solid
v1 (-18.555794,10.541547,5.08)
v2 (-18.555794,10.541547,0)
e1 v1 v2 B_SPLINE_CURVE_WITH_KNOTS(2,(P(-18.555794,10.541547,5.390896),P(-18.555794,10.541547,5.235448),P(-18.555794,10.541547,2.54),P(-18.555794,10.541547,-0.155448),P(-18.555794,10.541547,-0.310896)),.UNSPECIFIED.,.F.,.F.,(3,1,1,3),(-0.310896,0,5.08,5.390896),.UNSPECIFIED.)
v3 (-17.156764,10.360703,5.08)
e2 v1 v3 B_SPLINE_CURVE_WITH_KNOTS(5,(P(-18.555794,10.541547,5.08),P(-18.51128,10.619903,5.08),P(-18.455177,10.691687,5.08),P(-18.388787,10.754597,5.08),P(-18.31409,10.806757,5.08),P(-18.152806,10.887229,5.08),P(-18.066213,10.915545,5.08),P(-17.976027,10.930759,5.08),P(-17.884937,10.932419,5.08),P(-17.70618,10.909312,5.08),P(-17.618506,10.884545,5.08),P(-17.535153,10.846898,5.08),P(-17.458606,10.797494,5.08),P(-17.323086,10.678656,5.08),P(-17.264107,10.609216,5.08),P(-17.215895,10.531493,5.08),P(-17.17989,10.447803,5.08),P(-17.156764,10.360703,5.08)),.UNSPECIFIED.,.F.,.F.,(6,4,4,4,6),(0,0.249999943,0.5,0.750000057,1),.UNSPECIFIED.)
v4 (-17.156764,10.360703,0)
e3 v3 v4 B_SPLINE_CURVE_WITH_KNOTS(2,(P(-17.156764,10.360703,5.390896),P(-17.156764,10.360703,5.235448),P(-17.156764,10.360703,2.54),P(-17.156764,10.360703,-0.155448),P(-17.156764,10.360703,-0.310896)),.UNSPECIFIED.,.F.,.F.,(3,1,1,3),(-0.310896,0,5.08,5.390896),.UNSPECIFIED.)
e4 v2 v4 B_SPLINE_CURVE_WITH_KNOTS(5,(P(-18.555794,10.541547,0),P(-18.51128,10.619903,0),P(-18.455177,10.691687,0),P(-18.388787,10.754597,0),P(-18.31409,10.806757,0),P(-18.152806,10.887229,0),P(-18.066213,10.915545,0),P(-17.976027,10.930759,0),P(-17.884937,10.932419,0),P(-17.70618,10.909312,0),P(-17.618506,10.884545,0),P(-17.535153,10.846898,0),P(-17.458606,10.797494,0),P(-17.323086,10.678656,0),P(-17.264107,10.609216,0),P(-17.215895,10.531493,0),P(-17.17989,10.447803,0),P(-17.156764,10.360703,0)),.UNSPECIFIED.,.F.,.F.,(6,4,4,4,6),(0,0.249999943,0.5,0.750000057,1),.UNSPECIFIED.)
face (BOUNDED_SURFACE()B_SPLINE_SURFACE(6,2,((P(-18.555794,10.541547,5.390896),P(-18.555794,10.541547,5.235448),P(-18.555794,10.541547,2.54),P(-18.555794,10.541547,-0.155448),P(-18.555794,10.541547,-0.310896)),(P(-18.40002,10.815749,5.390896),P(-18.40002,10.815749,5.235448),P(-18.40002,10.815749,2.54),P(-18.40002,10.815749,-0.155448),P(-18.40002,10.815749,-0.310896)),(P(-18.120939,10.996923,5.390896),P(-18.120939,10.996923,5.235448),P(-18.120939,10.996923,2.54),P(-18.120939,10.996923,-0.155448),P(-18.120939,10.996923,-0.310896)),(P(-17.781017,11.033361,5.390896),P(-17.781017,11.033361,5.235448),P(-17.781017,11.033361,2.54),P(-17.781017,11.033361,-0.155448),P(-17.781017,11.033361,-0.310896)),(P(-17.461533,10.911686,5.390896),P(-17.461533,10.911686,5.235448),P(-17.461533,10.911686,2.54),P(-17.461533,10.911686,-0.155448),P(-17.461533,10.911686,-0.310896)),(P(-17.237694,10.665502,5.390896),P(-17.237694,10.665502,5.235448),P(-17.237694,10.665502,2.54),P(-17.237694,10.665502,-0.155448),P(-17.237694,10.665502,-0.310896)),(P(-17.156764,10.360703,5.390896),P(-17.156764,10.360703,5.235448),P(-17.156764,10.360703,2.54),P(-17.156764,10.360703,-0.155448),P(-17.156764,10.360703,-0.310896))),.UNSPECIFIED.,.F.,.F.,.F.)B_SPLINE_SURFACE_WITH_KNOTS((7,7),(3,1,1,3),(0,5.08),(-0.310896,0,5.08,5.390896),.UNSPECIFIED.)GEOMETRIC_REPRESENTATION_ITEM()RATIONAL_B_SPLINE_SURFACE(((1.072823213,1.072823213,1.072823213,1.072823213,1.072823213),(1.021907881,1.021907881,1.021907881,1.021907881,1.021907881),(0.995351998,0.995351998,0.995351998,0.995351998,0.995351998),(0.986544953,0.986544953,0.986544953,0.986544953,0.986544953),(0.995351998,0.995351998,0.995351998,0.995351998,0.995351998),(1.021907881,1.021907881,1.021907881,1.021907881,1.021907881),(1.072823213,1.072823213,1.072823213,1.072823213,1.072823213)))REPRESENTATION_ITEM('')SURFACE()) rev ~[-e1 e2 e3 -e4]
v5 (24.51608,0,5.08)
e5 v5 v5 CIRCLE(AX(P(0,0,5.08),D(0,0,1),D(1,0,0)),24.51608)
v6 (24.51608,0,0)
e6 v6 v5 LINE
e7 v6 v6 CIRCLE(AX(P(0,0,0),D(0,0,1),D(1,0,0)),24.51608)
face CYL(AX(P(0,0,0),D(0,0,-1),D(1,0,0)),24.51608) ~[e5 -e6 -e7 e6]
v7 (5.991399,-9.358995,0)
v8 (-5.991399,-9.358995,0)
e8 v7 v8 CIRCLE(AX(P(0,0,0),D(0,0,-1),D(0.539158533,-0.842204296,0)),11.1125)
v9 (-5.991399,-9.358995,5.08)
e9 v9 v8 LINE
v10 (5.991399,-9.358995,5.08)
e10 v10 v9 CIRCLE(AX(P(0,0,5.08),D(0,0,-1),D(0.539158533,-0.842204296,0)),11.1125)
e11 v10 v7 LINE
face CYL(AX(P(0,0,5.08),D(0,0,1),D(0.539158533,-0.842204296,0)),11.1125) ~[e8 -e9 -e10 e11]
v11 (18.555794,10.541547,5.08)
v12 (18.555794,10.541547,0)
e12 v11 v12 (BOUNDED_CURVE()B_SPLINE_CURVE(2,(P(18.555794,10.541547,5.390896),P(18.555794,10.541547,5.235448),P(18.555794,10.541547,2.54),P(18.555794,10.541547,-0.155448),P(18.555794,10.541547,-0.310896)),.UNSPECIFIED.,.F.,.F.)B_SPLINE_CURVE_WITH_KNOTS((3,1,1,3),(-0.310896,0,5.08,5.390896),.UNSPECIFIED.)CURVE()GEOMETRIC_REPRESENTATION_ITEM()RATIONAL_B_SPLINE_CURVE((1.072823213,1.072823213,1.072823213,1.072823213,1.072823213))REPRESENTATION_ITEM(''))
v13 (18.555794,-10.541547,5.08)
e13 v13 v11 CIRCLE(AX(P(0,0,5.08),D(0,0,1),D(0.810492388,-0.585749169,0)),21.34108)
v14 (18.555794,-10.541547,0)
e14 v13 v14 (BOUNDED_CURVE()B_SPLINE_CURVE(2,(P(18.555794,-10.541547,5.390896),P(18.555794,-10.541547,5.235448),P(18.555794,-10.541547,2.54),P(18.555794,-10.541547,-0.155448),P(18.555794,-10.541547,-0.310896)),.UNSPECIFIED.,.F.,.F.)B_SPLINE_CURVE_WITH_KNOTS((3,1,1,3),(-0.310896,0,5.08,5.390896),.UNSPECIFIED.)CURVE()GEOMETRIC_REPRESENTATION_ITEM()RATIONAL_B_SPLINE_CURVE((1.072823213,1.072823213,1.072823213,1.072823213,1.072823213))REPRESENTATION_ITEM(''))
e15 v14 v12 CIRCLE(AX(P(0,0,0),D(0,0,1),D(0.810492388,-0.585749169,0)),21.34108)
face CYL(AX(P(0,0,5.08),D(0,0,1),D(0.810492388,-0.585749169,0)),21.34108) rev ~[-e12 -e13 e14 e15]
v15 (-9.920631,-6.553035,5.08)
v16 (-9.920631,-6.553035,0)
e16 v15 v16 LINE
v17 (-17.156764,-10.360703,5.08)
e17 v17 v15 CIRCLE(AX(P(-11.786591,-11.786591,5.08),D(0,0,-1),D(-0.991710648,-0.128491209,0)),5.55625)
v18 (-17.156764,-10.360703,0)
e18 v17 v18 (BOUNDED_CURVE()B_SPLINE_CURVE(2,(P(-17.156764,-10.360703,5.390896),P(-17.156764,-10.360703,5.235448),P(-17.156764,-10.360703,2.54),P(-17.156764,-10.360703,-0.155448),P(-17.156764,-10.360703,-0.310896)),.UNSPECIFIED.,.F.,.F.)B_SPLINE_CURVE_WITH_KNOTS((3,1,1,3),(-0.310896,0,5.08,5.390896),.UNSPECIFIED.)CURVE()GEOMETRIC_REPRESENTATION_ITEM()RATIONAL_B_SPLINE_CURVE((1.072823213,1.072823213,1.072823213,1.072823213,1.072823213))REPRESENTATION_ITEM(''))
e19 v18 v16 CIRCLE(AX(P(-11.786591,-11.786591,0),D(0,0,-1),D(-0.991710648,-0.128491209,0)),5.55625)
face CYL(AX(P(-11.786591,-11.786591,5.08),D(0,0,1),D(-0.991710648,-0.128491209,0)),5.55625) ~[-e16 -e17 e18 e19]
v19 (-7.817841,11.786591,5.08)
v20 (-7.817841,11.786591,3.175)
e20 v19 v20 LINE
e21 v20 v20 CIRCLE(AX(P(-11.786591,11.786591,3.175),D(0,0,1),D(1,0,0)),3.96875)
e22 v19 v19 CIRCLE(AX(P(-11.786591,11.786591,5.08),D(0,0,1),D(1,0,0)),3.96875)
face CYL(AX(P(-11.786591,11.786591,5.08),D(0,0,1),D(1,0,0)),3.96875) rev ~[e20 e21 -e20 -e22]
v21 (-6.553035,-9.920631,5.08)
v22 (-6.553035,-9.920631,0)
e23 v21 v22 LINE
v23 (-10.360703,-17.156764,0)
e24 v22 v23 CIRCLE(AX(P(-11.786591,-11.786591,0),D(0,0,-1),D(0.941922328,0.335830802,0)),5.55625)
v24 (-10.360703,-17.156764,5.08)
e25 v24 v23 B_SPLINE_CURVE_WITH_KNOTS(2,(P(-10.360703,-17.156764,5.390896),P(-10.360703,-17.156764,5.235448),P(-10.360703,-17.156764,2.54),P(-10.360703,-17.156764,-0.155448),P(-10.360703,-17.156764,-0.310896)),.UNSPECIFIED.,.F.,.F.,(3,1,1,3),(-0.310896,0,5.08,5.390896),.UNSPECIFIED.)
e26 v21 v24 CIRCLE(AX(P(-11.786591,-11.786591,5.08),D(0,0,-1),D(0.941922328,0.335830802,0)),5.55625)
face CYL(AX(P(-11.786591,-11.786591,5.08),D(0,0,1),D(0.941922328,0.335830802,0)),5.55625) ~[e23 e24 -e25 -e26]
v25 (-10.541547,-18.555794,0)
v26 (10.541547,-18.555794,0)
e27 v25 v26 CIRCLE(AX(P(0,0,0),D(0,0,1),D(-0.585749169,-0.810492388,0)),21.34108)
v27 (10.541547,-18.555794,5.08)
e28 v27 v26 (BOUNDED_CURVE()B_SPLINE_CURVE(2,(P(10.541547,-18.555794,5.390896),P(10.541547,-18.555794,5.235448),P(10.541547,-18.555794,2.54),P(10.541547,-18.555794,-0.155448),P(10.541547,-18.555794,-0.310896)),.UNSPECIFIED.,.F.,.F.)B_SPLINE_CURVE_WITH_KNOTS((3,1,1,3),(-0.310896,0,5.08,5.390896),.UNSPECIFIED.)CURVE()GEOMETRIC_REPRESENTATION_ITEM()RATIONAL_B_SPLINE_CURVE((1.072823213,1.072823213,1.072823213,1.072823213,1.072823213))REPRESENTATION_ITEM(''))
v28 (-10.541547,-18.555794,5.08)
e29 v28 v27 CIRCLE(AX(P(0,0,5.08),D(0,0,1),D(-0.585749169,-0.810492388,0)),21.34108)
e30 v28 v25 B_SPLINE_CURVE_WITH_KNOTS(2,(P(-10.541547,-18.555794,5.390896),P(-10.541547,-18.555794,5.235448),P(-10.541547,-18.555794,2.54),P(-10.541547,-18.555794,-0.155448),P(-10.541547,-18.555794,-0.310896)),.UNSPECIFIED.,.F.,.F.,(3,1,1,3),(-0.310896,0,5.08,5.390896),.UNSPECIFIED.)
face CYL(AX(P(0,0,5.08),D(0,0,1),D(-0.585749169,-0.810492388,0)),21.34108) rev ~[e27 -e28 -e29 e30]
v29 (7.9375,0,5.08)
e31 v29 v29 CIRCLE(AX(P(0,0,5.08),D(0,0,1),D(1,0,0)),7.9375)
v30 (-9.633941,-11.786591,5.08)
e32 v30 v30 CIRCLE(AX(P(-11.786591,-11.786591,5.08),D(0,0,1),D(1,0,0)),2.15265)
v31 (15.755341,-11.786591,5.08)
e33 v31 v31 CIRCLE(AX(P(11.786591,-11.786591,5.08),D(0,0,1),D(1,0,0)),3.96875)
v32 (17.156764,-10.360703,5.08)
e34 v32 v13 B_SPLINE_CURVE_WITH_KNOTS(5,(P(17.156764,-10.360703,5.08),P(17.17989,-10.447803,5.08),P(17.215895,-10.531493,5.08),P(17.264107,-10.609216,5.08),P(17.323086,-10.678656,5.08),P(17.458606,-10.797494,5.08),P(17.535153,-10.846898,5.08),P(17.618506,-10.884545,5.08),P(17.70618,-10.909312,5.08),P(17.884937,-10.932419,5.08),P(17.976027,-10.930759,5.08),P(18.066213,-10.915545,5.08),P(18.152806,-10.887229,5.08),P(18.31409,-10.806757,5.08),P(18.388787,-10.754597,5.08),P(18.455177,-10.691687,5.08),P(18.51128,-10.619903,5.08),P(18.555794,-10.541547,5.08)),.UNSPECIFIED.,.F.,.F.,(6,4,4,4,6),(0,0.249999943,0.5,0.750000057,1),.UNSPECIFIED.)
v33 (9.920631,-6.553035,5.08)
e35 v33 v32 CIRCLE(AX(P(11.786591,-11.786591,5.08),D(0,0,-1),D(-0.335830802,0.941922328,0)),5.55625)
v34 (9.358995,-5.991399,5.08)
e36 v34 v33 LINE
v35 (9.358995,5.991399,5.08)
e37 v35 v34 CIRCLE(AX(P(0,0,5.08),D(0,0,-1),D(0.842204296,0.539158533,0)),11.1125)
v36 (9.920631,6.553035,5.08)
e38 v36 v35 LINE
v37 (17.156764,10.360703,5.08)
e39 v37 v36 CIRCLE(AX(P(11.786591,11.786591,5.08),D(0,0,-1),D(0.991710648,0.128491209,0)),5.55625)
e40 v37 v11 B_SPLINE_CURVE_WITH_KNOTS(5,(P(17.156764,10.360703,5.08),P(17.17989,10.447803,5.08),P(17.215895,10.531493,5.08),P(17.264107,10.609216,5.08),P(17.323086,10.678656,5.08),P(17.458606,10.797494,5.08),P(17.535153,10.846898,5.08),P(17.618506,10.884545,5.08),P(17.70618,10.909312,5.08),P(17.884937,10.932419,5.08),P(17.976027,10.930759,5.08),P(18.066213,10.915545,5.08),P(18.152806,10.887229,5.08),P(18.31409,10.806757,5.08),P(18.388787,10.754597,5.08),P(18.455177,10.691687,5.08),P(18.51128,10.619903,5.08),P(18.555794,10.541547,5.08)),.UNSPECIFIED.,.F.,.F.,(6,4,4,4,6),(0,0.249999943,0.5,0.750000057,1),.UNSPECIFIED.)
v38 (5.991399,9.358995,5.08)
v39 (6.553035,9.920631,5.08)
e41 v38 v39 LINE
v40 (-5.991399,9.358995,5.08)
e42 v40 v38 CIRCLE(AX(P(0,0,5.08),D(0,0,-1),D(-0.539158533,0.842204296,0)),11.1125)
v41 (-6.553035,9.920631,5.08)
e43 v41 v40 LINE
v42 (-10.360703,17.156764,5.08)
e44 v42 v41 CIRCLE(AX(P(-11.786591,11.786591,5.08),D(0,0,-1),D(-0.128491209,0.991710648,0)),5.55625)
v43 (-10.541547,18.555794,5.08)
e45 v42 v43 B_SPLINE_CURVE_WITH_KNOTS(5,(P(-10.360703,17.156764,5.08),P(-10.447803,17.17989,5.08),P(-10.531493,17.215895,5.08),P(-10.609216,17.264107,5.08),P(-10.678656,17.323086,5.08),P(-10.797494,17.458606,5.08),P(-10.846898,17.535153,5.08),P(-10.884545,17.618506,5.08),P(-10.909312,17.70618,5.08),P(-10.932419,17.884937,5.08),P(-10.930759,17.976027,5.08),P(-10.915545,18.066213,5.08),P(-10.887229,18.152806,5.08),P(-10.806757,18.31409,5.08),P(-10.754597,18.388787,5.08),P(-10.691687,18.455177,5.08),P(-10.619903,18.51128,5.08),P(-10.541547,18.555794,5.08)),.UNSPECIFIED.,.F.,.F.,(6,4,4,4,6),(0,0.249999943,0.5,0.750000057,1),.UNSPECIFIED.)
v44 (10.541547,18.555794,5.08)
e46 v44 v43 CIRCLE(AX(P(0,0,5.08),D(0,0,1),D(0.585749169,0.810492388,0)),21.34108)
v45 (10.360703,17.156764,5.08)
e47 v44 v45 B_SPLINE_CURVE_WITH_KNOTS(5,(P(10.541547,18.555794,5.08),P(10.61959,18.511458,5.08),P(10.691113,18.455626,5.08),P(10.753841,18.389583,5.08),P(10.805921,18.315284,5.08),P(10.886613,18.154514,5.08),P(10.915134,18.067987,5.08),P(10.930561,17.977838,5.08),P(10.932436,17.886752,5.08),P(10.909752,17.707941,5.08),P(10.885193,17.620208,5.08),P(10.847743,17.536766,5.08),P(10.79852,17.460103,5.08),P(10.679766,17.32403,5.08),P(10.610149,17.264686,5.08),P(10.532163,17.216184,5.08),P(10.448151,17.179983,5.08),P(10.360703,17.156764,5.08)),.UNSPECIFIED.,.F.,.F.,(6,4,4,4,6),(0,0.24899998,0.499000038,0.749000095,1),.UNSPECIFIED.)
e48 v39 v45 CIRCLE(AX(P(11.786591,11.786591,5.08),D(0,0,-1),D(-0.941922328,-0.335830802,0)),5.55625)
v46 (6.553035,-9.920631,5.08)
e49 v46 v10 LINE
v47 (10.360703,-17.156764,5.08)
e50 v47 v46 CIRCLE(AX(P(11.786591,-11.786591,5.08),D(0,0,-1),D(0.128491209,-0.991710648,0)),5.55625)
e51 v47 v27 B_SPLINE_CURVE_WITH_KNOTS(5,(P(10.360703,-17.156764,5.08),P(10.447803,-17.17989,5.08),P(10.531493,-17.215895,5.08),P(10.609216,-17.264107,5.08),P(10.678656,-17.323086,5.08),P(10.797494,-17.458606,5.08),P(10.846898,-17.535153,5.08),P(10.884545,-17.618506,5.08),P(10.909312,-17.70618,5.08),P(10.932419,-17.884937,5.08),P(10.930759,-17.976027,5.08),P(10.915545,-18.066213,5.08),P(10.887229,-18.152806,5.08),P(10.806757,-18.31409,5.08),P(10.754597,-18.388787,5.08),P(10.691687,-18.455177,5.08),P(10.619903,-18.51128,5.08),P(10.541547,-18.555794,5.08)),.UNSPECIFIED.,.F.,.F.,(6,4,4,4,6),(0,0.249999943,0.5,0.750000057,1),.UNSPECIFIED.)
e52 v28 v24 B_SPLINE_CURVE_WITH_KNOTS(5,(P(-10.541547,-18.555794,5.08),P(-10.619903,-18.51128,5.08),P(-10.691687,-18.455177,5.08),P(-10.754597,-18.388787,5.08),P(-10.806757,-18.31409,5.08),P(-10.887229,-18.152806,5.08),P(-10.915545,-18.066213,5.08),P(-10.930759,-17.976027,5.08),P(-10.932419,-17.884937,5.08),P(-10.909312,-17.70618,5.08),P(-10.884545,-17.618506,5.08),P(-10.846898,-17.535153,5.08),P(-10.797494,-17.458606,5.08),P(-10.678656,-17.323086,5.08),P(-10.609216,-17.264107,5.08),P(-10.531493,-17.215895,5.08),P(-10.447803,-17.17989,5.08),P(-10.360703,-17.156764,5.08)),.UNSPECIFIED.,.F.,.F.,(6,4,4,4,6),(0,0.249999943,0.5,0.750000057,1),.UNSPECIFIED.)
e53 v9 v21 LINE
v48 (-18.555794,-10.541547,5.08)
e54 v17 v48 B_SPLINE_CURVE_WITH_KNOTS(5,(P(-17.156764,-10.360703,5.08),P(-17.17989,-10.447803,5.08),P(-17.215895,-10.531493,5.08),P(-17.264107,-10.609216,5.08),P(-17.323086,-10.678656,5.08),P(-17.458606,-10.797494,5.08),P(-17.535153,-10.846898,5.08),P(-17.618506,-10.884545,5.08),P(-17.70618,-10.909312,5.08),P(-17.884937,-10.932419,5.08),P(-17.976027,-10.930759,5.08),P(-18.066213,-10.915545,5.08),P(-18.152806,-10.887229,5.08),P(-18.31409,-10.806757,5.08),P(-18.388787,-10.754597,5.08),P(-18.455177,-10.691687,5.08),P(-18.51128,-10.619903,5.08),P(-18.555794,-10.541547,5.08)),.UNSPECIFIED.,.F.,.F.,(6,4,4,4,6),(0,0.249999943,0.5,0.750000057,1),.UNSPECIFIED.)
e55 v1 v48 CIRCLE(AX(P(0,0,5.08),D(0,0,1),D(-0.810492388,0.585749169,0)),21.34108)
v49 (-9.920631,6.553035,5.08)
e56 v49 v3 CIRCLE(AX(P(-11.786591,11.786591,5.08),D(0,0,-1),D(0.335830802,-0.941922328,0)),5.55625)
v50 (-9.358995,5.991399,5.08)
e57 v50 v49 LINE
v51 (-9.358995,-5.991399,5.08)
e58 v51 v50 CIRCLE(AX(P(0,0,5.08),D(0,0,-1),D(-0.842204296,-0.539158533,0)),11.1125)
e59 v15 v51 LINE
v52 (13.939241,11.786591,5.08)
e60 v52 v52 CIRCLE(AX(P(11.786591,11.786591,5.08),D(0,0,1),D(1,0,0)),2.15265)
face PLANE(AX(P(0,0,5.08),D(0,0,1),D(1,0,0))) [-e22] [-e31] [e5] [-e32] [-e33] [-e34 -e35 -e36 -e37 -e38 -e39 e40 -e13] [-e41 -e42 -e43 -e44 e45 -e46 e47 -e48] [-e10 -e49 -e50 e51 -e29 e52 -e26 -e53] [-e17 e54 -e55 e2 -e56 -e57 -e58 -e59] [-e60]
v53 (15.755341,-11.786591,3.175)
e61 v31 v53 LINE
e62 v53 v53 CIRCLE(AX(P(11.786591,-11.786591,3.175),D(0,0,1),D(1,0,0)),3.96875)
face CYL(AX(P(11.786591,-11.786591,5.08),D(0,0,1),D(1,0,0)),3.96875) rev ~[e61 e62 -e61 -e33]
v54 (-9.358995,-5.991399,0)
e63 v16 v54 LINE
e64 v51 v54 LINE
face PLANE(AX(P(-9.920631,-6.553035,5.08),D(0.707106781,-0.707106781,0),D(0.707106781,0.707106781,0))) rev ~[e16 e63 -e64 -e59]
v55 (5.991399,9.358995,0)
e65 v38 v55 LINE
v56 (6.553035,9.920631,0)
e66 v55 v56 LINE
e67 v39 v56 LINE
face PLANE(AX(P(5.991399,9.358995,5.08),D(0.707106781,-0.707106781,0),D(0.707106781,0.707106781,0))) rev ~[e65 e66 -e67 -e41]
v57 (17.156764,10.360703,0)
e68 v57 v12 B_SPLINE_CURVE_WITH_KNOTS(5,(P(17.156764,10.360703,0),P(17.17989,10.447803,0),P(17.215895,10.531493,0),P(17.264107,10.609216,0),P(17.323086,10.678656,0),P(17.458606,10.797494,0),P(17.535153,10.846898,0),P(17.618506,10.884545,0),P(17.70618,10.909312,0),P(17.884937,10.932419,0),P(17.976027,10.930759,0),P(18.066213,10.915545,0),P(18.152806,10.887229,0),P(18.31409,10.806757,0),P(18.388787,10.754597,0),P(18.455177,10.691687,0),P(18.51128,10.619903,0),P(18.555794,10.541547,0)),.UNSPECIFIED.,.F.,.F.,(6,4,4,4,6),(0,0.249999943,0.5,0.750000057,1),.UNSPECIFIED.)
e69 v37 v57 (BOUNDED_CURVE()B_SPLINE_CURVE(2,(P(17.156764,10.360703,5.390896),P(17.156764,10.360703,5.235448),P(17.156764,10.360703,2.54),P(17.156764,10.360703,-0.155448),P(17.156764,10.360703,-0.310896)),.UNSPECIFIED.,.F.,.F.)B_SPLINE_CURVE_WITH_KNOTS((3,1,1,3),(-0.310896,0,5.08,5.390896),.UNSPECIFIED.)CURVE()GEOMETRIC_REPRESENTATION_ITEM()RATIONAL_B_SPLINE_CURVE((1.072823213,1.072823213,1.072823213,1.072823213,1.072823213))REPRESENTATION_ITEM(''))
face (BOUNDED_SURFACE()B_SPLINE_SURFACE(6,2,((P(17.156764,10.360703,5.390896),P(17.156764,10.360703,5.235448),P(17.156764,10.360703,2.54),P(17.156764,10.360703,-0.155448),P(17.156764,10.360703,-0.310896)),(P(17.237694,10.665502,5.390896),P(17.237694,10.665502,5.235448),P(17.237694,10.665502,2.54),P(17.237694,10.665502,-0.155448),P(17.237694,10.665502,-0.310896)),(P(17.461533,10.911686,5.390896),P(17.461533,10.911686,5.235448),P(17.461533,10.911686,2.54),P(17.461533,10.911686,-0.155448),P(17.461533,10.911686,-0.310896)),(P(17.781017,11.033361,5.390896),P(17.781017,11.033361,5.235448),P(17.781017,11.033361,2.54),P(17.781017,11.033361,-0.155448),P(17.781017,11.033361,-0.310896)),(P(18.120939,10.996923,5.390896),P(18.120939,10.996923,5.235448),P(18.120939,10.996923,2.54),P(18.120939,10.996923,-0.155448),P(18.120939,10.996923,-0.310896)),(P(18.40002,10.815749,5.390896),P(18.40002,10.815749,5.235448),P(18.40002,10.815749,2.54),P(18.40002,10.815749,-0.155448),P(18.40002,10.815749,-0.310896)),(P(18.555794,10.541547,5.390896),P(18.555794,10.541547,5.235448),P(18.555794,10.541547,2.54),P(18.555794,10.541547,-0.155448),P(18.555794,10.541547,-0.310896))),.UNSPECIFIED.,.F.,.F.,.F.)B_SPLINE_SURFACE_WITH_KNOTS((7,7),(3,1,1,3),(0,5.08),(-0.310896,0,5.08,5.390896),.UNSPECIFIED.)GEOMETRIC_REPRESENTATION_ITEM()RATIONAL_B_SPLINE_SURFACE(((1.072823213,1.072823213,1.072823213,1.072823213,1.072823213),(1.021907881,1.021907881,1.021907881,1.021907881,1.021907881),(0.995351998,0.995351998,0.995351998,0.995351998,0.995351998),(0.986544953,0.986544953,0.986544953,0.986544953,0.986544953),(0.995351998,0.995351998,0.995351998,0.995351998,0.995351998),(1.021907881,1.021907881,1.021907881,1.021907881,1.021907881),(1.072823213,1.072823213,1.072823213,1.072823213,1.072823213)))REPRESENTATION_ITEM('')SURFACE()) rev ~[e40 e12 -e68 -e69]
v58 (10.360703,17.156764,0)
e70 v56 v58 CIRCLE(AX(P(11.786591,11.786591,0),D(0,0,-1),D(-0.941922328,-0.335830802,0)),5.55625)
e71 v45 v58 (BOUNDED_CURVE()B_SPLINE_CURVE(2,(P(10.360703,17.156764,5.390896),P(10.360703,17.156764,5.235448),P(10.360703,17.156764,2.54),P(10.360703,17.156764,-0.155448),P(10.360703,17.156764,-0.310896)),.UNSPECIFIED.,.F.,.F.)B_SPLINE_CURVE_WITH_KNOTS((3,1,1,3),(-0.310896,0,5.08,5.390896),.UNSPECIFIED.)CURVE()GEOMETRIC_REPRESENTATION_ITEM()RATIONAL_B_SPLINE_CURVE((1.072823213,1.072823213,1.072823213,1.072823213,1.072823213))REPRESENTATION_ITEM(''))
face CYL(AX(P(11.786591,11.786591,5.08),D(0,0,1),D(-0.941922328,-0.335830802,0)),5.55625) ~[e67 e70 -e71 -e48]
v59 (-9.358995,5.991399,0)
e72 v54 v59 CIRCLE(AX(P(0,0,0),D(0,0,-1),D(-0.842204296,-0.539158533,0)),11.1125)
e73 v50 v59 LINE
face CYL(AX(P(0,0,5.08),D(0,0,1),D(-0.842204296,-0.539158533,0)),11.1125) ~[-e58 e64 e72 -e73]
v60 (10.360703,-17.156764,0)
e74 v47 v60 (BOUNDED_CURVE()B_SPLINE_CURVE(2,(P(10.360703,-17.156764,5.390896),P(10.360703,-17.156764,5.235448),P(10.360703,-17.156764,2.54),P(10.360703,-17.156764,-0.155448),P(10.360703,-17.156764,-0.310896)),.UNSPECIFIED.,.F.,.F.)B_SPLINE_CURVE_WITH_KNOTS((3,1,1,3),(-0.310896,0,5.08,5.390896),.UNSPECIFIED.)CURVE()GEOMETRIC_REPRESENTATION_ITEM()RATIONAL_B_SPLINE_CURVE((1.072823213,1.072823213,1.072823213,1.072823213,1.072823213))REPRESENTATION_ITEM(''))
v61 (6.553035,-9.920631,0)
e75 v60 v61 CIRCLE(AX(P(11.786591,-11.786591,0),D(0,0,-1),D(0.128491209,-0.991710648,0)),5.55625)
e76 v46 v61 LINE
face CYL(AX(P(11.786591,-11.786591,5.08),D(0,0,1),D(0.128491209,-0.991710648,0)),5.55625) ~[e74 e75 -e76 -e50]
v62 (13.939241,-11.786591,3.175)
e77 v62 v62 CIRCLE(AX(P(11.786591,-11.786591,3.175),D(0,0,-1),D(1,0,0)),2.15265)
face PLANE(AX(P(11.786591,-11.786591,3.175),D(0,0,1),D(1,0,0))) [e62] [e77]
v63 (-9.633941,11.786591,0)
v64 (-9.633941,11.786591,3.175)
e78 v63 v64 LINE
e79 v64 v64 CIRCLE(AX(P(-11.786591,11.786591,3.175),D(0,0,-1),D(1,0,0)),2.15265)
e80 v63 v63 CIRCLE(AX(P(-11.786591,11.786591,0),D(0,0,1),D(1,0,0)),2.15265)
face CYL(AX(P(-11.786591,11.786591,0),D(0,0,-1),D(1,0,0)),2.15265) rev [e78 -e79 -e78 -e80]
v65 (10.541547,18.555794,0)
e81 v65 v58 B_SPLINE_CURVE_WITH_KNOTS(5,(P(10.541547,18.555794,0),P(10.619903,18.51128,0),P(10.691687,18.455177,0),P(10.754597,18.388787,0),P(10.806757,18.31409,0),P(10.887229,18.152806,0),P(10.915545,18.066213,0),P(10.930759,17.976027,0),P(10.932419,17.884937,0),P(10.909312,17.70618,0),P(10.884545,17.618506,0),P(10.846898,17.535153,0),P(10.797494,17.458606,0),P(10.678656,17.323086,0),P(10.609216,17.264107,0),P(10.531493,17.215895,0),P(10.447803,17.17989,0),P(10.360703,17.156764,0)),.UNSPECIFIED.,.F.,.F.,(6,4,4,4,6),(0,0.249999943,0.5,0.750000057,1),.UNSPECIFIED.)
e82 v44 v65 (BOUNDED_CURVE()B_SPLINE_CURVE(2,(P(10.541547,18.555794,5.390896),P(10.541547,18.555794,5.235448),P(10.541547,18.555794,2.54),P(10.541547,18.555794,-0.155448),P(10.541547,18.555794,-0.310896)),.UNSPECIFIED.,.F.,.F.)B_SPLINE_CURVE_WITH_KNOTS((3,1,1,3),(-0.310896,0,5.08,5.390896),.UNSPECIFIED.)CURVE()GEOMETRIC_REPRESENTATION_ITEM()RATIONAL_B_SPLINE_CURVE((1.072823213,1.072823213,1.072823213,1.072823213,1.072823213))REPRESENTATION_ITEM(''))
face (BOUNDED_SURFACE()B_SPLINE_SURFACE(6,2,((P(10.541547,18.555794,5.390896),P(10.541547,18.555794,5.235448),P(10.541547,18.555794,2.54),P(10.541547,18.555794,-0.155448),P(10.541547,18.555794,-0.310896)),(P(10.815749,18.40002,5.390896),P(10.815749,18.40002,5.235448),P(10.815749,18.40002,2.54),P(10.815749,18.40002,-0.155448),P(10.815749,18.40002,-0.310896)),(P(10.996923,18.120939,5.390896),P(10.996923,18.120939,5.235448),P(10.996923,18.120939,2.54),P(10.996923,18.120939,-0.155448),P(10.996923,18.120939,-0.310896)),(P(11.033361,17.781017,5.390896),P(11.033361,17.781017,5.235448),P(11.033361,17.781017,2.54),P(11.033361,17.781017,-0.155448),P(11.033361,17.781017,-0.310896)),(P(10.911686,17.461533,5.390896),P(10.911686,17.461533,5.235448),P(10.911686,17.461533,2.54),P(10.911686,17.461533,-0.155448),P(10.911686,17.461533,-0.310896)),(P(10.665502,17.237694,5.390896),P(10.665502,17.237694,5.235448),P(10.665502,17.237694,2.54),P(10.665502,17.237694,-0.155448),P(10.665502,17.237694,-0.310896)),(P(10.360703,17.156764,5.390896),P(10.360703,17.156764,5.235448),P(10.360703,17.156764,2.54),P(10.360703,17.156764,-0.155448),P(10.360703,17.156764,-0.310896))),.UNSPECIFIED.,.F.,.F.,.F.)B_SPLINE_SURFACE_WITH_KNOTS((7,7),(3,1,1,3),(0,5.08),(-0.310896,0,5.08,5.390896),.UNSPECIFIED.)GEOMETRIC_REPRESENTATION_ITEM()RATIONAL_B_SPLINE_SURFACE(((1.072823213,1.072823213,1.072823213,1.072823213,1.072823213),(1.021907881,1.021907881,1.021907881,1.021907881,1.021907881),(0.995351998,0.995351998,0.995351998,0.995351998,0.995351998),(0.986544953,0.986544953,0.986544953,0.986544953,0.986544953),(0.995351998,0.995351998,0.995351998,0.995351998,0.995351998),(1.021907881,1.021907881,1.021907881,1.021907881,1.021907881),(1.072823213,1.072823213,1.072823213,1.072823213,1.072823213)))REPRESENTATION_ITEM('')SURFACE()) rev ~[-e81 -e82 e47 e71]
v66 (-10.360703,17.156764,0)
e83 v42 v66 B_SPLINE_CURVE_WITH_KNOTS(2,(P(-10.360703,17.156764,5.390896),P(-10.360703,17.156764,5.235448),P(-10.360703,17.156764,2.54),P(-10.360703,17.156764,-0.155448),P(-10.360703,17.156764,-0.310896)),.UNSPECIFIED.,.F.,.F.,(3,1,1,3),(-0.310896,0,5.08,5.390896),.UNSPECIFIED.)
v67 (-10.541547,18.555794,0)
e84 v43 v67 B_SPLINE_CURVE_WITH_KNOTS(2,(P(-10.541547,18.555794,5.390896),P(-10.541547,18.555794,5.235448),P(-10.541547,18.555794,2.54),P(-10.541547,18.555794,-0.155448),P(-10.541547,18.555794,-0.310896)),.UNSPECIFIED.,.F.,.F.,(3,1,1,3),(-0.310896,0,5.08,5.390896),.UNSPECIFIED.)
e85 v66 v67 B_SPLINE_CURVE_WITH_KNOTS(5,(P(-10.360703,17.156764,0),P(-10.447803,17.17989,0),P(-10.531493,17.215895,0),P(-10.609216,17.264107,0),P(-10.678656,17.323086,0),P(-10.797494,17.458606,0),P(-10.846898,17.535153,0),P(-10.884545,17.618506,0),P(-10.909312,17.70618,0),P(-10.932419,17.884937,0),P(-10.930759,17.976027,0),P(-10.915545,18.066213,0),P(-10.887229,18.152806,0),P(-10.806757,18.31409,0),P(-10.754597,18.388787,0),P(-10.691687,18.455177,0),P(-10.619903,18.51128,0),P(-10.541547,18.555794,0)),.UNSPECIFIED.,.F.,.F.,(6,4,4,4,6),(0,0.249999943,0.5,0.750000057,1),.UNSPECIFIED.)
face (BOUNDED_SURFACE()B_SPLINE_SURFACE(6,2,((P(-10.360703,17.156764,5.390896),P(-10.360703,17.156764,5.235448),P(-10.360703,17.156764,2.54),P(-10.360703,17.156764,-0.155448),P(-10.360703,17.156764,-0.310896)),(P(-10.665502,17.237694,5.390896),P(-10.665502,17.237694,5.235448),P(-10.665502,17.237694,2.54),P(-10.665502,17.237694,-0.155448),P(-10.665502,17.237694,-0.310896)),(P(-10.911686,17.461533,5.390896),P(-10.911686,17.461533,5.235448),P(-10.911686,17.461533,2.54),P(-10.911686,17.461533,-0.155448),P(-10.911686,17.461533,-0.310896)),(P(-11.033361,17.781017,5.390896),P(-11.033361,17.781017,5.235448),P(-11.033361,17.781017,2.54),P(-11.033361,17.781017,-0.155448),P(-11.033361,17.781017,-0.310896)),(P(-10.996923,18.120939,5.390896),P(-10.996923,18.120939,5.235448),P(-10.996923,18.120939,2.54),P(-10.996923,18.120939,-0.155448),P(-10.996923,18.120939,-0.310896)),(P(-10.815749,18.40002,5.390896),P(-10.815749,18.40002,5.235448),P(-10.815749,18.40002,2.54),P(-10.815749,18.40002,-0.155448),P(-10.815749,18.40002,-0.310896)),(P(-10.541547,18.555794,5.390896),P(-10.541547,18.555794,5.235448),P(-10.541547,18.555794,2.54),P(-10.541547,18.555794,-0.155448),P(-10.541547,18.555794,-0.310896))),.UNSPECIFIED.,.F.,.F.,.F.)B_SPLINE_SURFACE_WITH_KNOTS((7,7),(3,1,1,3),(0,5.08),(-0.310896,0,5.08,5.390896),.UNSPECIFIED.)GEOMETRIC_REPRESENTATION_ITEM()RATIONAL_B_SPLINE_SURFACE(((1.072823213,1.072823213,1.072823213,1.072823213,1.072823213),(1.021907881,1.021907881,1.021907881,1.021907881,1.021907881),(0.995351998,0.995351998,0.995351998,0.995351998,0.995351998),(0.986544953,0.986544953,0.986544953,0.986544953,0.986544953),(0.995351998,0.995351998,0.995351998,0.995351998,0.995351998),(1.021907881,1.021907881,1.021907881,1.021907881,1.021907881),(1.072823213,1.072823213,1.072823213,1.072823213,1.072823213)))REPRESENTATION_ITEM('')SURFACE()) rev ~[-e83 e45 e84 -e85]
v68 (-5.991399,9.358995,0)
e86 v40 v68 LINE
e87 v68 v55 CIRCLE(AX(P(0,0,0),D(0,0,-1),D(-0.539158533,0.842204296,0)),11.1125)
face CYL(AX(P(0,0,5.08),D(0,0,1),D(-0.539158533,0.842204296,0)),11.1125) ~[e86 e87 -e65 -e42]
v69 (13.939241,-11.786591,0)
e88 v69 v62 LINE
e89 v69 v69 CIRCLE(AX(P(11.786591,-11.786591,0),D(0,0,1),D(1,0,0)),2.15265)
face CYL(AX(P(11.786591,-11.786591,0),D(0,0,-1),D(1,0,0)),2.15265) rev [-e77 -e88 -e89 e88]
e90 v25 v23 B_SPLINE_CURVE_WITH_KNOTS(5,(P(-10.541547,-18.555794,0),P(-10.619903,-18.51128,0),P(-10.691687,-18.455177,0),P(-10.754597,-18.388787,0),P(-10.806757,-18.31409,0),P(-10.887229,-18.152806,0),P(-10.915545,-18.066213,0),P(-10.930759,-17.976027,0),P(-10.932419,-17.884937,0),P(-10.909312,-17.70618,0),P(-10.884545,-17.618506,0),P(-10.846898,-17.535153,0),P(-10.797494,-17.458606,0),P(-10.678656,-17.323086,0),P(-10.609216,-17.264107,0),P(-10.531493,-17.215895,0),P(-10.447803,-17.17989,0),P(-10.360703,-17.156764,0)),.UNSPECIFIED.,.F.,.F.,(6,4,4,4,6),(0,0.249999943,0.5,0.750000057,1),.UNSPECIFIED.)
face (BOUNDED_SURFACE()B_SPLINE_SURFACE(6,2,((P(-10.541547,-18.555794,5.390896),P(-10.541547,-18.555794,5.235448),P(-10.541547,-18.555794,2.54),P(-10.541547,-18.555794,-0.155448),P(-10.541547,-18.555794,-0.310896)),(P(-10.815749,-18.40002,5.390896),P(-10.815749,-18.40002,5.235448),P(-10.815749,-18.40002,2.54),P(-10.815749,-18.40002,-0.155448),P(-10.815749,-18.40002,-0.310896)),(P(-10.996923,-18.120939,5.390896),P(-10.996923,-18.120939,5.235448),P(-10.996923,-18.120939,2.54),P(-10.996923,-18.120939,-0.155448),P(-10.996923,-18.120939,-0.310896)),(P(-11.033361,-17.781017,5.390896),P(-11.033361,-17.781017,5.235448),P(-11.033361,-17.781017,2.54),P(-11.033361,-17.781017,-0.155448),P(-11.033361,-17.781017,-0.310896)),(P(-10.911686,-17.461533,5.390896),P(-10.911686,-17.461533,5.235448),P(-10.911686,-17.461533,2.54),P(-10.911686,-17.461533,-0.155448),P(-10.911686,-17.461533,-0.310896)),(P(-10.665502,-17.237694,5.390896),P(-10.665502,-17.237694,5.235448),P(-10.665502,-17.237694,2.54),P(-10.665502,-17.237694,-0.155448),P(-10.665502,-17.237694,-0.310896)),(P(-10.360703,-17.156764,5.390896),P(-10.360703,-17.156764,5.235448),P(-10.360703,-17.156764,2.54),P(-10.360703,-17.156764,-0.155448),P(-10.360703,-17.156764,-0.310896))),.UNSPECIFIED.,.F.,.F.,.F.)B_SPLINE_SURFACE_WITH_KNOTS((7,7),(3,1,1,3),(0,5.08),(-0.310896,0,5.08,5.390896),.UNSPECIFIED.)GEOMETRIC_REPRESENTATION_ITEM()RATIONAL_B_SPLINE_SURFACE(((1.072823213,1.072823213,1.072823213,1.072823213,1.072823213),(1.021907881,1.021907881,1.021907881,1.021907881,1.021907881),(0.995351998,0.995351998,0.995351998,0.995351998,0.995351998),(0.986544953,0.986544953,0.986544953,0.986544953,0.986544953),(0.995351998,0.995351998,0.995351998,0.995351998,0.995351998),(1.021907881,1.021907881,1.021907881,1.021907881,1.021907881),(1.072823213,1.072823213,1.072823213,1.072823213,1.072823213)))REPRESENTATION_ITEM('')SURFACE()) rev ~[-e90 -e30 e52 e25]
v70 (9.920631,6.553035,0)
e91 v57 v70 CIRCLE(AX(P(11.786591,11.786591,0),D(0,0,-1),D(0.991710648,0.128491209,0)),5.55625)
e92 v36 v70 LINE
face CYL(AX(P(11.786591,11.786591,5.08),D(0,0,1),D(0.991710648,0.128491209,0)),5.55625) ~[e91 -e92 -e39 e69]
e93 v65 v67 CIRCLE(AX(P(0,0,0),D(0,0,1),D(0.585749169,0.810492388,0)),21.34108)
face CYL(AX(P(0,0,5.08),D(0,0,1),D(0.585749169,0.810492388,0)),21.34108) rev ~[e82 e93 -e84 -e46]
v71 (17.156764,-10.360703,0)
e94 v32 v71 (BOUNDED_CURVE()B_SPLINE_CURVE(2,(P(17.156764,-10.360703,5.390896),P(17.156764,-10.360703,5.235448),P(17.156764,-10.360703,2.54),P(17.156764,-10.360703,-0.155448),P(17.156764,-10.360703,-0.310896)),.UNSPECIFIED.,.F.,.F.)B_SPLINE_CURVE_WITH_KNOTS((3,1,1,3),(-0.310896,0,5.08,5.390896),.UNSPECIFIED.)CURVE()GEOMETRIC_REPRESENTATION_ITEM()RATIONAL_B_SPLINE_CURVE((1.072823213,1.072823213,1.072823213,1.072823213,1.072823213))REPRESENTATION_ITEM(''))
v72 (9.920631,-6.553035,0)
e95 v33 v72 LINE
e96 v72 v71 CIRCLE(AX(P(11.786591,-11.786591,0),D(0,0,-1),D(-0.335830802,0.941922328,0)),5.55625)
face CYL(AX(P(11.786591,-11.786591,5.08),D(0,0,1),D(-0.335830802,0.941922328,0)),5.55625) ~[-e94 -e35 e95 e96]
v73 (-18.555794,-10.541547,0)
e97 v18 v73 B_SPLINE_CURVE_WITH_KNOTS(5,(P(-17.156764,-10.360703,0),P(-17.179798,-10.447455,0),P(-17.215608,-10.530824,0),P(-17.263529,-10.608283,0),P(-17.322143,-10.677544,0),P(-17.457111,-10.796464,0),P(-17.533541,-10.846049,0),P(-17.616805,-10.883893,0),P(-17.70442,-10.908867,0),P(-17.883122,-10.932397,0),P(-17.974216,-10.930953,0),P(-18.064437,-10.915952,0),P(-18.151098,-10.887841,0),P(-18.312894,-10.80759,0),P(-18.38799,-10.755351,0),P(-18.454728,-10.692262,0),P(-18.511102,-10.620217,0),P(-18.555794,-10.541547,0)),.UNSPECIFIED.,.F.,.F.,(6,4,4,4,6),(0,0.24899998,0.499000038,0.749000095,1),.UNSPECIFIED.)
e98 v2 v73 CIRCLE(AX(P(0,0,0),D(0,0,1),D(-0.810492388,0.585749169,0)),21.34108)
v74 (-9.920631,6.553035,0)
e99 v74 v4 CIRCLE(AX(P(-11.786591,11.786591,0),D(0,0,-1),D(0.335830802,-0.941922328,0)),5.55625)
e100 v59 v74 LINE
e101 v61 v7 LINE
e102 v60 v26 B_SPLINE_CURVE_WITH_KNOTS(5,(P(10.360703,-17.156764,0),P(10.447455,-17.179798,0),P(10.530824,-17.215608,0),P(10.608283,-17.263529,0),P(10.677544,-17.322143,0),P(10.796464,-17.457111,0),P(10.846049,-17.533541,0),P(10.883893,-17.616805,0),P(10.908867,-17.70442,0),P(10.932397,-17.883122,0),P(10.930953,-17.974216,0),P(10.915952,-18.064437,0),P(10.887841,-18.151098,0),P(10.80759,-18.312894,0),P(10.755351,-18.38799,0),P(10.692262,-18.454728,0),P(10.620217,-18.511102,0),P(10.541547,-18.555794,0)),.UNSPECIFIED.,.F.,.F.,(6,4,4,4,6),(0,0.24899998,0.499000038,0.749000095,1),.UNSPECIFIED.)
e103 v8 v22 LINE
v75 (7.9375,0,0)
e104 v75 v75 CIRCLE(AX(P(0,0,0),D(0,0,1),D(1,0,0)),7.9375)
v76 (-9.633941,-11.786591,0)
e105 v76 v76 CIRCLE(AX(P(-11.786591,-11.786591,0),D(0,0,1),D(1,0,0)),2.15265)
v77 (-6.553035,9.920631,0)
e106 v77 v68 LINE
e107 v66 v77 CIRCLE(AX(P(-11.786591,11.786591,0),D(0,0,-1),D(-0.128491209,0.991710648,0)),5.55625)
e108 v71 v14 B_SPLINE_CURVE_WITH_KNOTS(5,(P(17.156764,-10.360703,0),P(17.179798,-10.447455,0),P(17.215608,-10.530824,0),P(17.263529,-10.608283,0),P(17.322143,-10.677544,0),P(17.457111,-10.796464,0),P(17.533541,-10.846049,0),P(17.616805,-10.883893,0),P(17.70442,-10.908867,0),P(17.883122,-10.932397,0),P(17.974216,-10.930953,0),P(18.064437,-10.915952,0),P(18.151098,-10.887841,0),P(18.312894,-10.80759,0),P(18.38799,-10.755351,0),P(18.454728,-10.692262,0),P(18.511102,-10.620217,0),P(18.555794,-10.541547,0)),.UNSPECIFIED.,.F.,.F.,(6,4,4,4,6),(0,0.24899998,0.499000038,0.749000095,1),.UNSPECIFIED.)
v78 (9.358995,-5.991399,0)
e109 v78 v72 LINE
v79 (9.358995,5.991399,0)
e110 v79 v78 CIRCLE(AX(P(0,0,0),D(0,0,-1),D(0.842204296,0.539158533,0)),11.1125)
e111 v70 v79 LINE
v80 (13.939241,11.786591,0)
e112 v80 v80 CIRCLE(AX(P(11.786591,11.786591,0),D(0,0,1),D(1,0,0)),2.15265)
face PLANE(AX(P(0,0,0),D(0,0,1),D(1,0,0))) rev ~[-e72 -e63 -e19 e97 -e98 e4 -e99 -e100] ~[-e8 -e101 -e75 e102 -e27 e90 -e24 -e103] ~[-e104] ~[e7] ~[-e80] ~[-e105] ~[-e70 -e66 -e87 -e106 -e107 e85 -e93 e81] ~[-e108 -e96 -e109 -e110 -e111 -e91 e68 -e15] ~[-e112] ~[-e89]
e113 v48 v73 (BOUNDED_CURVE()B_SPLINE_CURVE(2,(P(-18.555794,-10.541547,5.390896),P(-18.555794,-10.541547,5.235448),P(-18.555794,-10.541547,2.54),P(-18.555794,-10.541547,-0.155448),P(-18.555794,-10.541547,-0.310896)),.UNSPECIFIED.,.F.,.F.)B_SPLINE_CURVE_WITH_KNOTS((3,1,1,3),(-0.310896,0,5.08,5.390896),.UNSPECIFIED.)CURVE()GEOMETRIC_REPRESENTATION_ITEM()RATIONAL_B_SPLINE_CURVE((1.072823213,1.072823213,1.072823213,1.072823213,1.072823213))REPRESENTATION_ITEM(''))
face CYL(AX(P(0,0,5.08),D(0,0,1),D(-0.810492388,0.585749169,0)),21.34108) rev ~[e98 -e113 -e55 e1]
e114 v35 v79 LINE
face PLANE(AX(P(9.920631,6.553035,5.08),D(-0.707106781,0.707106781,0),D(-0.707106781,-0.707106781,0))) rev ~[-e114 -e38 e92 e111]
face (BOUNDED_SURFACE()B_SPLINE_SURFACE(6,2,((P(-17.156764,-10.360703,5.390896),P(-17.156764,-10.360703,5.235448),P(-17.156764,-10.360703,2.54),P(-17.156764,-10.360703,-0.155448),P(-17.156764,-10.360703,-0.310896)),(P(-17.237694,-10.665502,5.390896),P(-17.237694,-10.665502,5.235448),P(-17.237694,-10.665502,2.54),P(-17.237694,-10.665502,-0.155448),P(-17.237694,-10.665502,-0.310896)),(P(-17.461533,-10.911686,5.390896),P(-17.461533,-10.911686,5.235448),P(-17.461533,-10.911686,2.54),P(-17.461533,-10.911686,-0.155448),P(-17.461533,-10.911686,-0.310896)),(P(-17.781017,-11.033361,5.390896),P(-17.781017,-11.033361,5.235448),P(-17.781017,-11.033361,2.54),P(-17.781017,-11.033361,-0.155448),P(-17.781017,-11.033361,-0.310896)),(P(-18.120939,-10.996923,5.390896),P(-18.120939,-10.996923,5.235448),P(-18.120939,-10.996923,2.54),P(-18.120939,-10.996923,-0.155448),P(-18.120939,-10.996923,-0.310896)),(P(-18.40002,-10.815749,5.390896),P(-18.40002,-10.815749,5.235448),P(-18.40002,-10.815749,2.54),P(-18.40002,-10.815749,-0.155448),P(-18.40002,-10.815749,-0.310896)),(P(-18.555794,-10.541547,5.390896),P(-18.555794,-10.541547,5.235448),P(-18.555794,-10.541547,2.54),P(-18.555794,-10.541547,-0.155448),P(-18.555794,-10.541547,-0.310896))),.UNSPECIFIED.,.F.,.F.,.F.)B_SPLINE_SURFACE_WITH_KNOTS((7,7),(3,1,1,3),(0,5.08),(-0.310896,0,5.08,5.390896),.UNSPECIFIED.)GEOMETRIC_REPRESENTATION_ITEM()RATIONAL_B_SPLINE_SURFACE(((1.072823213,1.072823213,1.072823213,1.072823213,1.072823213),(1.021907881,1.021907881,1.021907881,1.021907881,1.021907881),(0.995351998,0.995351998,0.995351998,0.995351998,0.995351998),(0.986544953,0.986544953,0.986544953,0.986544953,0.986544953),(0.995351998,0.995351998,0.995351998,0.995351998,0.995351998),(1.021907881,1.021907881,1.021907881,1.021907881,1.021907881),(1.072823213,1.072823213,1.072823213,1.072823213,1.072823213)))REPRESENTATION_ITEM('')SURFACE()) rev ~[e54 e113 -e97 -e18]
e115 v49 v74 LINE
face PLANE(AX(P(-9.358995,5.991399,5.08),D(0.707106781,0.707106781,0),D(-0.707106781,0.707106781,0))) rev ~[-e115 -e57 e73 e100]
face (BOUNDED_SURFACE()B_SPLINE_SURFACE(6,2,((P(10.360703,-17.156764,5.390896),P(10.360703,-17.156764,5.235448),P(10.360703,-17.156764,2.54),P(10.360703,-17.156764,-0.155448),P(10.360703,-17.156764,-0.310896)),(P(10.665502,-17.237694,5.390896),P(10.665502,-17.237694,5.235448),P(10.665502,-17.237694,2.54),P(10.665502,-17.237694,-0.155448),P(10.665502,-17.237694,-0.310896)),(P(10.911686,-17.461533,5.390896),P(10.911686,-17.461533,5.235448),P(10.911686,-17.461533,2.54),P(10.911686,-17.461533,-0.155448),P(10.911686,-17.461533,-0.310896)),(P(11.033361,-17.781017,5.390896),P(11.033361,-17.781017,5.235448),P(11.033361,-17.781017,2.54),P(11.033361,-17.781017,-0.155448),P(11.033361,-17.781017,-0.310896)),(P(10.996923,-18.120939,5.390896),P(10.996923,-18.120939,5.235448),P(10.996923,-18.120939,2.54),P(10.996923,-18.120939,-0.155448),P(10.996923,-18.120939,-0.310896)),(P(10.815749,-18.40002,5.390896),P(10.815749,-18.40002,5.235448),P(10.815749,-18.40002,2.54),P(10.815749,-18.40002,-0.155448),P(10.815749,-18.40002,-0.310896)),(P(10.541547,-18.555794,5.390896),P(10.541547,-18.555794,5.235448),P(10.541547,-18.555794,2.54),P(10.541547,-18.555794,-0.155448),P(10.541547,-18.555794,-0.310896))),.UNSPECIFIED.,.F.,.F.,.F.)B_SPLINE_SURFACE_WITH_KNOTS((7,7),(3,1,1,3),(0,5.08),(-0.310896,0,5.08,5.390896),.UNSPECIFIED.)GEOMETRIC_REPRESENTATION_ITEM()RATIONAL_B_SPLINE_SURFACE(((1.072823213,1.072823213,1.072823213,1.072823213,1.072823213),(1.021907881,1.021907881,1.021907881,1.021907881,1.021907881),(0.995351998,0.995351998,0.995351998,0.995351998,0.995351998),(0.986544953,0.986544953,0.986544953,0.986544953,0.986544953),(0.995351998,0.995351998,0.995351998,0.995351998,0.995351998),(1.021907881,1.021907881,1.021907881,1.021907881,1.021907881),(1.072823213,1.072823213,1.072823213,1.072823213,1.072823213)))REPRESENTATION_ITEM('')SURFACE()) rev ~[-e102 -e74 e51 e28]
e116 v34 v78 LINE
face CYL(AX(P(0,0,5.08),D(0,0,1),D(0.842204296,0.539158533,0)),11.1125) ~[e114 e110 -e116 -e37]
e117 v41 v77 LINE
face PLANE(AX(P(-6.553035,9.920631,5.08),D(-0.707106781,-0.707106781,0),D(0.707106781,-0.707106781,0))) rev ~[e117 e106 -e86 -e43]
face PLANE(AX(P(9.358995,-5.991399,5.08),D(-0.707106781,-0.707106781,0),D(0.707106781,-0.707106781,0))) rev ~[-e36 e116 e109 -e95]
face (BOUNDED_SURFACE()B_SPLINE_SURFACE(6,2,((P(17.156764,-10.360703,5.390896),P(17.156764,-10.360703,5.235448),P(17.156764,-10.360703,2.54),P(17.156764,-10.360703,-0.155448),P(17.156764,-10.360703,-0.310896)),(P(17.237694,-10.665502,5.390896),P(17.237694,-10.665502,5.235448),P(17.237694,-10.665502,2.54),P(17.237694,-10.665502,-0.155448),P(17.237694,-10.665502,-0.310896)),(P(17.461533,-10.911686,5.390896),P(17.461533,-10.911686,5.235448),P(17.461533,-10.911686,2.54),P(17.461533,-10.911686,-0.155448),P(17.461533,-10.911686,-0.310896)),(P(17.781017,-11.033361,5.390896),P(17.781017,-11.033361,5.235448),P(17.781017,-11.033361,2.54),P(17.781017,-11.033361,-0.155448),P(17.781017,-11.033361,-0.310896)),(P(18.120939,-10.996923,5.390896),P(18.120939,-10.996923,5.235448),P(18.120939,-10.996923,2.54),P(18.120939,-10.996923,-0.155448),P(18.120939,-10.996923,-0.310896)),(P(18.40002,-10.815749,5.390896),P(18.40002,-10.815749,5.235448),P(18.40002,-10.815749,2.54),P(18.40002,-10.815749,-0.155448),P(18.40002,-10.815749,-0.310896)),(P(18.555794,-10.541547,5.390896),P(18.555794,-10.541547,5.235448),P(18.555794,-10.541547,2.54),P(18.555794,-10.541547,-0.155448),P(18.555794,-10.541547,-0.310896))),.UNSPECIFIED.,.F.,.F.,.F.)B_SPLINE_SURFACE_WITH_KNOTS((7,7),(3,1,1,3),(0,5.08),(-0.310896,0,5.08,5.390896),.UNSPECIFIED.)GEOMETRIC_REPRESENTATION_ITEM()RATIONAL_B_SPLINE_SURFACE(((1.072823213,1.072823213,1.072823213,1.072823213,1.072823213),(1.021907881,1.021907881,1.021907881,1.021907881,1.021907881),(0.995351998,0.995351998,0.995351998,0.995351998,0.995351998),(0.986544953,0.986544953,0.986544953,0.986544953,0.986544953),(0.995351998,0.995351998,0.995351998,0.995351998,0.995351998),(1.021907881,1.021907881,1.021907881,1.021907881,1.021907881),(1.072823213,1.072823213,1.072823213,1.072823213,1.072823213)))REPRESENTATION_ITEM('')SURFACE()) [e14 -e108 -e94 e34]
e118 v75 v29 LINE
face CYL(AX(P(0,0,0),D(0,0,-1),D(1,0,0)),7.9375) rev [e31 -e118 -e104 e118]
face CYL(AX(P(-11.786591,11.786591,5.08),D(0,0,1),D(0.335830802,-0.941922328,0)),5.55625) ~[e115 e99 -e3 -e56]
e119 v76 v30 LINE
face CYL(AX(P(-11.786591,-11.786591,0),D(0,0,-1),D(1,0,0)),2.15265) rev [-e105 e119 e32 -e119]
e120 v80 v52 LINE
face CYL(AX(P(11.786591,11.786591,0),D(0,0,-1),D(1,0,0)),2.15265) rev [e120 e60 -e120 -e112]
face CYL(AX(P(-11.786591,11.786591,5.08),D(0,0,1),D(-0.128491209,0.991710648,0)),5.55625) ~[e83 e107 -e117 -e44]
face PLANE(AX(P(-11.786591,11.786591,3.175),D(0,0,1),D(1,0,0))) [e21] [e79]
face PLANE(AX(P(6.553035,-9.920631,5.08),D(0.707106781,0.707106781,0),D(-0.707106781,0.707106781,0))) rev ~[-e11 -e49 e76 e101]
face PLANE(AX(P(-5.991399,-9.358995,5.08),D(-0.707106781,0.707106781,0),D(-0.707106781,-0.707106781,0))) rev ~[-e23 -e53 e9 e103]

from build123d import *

# Parameters (mm, degrees)
F0_R            = 24.51608
F0_R_2          = 2.15265
F0_R_3          = 7.9375
F1_DEPTH        = 5.08
F3_DEPTH        = 5.08
F3_COPIES_COUNT = 4
F4_R            = 0.762
F5_R            = 3.96875
F6_DEPTH        = 1.905


# Not quite as in the source:
# - a pattern or mirror of a feature is missing from the dataset's text; its kind, count and spacing are read off the source's solid


with BuildPart() as f1:
    # F0 (on Top) → F1 (new body)
    with BuildSketch(Plane.XY):
        Circle(F0_R)
        with Locations((-11.7865906, -11.7865906)):
            Circle(F0_R_2, mode=Mode.SUBTRACT)
        with Locations((11.7865906, -11.7865906)):
            Circle(F0_R_2, mode=Mode.SUBTRACT)
        with Locations((-11.7865906, 11.7865906)):
            Circle(F0_R_2, mode=Mode.SUBTRACT)
        Circle(F0_R_3, mode=Mode.SUBTRACT)
        with Locations((11.7865906, 11.7865906)):
            Circle(F0_R_2, mode=Mode.SUBTRACT)
    extrude(amount=F1_DEPTH)

    # F2 (on face) → F3 (cut, through all)
    with BuildSketch(Plane.XY.offset(5.08)):
        with BuildLine():
            ThreePointArc((-12.5005198818, 17.2967828873), (-7.4612395718, 15.2741760893), (-6.553034663, 9.9206307084))
            Line((-6.553034663, 9.9206307084), (-5.9913991959, 9.3589952413))
            ThreePointArc((-5.9913991959, 9.3589952413), (0, 11.1125), (5.9913991959, 9.3589952413))
            Line((5.9913991959, 9.3589952413), (6.553034663, 9.9206307084))
            ThreePointArc((6.553034663, 9.9206307084), (7.4612395718, 15.2741760893), (12.5005198818, 17.2967828873))
            ThreePointArc((12.5005198818, 17.2967828873), (0, 21.34108), (-12.5005198818, 17.2967828873))
        make_face()
    f3 = extrude(amount=-F3_DEPTH, mode=Mode.SUBTRACT)

    # F3_copies: F3 ×4 about axis
    f3_copies_axis = Axis((0, 0, 0), (0, 0, 1))
    for i in range(1, F3_COPIES_COUNT):
        add(f3.rotate(f3_copies_axis, i * 360 / F3_COPIES_COUNT), mode=Mode.SUBTRACT)

    # F4
    f4_edges = [f1.edges().sort_by_distance(p)[0] for p in [
        (-12.50052, 17.296783, 2.54),
        (12.50052, 17.296783, 2.54),
        (-17.296783, -12.50052, 2.54),
        (-17.296783, 12.50052, 2.54),
        (12.50052, -17.296783, 2.54),
        (-12.50052, -17.296783, 2.54),
        (17.296783, 12.50052, 2.54),
        (17.296783, -12.50052, 2.54),
    ]]
    fillet(f4_edges, radius=F4_R)

    # F5 (on face) → F6 (cut)
    with BuildSketch(Plane.XY.offset(5.08)):
        with Locations((-11.7865906, 11.7865906)):
            Circle(F5_R)
        with Locations((11.7865906, -11.7865906)):
            Circle(F5_R)
    extrude(amount=-F6_DEPTH, mode=Mode.SUBTRACT)


solid = f1.part
